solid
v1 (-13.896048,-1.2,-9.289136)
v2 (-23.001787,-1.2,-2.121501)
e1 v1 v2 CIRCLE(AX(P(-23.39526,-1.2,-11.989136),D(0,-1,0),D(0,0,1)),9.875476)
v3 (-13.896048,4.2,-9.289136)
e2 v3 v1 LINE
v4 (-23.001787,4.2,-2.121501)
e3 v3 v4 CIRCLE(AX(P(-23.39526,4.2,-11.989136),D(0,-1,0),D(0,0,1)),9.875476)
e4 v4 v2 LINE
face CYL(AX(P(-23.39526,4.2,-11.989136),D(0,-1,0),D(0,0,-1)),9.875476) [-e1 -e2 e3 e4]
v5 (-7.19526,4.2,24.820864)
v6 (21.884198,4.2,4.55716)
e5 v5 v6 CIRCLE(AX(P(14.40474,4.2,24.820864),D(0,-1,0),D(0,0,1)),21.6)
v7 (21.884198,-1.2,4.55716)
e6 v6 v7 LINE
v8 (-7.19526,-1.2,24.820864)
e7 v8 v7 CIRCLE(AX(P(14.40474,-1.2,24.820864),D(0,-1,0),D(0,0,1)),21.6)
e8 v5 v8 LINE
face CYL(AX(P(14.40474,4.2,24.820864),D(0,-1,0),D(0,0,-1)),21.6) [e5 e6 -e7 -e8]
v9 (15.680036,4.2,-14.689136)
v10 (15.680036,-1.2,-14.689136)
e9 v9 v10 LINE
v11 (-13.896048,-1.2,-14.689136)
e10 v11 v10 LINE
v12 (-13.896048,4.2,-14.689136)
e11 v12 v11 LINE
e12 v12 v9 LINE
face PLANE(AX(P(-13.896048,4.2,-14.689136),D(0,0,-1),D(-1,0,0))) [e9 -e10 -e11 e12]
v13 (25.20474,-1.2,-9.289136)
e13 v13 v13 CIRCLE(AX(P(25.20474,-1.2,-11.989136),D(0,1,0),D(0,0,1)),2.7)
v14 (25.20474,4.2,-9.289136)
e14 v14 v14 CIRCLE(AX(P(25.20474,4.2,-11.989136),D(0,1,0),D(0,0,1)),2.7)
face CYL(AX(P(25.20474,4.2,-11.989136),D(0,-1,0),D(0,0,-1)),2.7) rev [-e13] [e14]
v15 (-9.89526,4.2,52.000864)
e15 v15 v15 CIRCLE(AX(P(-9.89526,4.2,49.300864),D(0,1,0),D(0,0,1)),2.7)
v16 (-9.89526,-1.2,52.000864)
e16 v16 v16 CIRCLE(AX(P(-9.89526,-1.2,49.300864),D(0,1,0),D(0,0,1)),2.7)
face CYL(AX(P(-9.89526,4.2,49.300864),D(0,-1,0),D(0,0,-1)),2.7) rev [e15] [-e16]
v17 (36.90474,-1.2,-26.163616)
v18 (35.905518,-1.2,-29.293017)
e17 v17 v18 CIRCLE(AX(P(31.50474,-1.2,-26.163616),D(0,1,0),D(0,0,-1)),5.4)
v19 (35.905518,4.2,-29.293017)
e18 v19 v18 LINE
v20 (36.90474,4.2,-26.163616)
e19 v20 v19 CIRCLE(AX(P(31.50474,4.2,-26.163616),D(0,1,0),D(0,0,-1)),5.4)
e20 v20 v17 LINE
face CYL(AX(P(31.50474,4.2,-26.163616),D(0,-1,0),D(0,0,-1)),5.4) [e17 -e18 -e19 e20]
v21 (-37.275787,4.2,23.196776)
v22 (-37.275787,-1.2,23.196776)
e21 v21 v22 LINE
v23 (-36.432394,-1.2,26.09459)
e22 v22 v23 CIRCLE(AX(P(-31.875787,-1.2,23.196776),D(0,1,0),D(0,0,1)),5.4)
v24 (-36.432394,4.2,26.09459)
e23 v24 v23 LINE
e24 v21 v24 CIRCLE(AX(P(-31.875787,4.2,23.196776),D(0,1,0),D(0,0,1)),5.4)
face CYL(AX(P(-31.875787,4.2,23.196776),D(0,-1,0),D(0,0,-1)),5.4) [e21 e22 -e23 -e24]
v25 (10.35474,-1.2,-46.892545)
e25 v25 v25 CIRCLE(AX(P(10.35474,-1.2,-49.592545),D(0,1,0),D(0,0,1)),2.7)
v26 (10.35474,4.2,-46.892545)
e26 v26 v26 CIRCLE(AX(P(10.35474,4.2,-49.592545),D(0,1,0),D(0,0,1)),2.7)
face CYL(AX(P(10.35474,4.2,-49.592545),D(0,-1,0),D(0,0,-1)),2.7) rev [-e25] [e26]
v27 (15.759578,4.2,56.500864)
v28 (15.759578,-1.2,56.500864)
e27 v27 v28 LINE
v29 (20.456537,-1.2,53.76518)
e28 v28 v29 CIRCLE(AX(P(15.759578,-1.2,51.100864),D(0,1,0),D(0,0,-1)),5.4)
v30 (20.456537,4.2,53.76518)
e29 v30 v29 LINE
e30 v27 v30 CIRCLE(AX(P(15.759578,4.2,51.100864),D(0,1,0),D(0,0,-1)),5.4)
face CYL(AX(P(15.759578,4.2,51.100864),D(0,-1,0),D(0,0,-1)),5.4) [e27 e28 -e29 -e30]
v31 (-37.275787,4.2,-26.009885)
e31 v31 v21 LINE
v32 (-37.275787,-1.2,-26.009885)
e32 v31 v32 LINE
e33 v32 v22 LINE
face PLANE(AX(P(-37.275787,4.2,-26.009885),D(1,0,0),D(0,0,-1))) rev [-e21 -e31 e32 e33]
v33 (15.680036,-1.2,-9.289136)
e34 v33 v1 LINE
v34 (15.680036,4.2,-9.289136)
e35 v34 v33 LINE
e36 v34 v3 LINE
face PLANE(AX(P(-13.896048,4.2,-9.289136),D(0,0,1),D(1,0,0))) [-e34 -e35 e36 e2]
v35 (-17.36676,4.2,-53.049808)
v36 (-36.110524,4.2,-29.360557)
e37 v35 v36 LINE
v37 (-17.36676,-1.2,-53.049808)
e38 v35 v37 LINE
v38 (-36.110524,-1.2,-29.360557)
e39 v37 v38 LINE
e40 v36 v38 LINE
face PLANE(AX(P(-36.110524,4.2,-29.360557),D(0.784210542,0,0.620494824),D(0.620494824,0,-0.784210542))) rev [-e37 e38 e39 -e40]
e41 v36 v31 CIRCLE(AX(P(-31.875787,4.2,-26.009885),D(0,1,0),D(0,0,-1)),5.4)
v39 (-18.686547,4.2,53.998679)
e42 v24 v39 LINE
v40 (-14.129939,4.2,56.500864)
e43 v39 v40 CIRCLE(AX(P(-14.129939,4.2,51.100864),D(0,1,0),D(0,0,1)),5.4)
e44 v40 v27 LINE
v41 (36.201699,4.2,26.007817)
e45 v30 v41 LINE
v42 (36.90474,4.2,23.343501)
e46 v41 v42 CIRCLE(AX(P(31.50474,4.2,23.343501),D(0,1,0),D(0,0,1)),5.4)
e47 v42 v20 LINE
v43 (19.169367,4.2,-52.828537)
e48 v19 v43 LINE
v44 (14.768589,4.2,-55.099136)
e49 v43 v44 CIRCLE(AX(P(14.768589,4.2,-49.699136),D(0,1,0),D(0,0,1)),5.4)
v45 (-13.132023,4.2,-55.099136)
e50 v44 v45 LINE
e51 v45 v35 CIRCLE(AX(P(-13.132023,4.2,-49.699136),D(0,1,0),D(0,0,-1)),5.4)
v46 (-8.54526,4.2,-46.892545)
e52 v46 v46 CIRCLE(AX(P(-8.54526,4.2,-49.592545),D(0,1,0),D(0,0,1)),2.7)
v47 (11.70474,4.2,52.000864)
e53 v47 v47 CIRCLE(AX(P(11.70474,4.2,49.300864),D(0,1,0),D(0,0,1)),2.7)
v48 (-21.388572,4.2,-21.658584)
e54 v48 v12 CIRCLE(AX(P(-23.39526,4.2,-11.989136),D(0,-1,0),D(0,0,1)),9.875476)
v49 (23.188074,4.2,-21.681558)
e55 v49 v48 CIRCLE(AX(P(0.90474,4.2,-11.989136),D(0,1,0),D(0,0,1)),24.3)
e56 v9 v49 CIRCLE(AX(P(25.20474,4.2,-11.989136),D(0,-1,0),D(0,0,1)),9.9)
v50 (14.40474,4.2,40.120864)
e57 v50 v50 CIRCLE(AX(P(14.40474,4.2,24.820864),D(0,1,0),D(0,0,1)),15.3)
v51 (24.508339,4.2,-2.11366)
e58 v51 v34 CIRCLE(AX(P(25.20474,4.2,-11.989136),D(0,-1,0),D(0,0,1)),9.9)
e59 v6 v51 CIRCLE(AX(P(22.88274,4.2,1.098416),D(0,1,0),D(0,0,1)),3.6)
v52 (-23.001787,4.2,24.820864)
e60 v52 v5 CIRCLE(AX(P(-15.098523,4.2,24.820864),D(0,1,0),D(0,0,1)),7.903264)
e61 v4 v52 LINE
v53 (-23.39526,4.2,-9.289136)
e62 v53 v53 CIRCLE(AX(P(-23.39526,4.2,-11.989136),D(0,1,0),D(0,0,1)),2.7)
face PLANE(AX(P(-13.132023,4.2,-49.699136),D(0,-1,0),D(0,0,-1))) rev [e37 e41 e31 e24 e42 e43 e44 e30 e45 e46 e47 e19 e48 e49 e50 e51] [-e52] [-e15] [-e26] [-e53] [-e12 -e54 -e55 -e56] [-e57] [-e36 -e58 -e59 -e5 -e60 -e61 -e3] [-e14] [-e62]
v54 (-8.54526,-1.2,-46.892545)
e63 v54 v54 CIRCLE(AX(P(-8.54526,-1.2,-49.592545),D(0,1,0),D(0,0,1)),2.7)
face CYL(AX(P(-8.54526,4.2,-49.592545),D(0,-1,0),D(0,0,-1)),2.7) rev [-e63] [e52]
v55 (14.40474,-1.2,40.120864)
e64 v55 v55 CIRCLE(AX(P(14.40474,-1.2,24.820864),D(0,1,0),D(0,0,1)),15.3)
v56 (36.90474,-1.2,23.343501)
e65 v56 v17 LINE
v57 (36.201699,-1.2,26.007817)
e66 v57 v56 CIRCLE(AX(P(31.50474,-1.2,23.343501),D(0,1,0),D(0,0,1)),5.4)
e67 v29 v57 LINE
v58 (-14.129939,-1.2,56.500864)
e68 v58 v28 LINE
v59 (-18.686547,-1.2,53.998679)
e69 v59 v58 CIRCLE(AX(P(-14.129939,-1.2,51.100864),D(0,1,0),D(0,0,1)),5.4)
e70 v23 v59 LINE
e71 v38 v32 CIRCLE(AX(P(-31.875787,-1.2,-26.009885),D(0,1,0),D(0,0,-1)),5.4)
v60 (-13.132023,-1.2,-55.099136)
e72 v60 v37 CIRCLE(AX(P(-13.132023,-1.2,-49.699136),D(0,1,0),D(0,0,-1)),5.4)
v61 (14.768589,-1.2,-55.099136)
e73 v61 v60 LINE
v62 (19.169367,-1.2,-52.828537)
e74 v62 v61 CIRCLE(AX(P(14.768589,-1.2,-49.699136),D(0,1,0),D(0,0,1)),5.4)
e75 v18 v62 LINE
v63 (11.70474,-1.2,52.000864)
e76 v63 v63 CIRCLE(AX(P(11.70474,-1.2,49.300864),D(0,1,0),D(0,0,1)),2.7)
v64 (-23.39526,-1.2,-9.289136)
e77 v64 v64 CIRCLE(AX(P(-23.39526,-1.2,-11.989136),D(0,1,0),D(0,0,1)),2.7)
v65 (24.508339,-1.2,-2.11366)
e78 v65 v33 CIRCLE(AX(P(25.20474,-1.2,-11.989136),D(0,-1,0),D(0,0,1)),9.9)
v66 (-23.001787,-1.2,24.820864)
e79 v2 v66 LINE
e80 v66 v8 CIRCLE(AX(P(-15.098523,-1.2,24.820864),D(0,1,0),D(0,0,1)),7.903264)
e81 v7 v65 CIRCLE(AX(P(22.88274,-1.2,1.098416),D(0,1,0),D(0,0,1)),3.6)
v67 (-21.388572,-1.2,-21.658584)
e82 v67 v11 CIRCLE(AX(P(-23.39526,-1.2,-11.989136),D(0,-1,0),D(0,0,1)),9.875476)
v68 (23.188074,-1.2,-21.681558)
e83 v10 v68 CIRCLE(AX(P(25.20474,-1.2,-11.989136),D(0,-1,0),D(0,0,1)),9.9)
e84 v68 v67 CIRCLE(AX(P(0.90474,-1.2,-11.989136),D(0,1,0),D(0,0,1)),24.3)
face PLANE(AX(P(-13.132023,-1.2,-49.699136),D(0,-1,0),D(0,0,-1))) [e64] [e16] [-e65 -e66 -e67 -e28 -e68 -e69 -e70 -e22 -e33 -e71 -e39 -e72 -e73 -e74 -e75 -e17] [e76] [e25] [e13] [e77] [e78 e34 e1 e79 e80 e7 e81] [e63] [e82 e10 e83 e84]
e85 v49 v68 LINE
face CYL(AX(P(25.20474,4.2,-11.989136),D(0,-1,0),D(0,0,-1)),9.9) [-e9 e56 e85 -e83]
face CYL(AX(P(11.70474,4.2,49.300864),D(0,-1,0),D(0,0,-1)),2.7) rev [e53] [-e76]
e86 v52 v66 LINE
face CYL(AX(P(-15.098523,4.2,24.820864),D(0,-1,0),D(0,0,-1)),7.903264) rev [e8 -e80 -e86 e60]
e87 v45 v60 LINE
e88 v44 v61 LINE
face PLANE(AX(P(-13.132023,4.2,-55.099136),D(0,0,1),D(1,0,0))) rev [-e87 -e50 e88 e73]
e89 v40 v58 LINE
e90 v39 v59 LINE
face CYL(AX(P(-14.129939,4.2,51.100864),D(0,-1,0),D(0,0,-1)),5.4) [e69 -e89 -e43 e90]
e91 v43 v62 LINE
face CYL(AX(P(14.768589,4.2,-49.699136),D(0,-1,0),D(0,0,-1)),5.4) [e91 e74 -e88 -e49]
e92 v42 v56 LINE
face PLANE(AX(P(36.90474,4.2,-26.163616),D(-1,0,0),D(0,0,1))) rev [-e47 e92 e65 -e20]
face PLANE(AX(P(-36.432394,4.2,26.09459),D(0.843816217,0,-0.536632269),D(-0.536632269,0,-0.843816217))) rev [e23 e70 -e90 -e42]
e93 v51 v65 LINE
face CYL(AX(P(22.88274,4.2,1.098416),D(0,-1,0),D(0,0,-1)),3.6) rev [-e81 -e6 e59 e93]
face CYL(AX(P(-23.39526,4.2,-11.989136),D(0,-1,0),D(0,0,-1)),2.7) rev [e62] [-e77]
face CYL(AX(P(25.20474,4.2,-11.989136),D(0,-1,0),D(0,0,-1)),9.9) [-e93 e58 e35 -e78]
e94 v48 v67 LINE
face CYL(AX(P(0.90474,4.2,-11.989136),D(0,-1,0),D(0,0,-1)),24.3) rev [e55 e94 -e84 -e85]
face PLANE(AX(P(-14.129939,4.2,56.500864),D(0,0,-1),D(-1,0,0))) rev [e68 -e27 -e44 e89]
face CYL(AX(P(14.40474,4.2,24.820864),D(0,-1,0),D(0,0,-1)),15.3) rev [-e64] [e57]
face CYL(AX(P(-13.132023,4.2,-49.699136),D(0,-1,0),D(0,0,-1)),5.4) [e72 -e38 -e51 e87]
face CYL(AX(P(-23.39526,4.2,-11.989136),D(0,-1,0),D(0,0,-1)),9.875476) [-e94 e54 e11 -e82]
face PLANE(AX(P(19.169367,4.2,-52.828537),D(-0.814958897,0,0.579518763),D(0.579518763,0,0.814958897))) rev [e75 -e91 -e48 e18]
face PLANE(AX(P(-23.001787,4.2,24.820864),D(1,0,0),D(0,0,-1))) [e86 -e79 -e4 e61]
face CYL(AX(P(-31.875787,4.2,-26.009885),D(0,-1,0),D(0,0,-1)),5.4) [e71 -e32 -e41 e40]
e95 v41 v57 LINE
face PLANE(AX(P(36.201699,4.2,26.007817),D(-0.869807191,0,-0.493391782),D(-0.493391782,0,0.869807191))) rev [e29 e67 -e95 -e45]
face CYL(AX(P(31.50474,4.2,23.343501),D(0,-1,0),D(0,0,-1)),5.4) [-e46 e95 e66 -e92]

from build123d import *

# Parameters (mm, degrees)
SKETCH1_R          = 8.5
SKETCH1_R_2        = 1.5
BASE_FLANGE1_DEPTH = 3
SCALE1_SCALE       = 1.8


# Sheet-metal steps are written as plain solids
with BuildPart() as part:
    # Sketch1 → Base-Flange1 (new body)
    with BuildSketch(Plane(origin=(0, 0, 0), x_dir=(1, 0, 0), z_dir=(0, 1, 0))):
        with BuildLine():
            Line((19.609421573, -14.059417906), (10.862109445, -29.480175346))
            ThreePointArc((10.862109445, -29.480175346), (9.762567662, -30.59234701), (8.252687872, -31))
            Line((8.252687872, -31), (-8.352599575, -31))
            ThreePointArc((-8.352599575, -31), (-9.796606082, -30.629609326), (-10.884048227, -29.609896806))
            Line((-10.884048227, -29.609896806), (-20.742852548, -14.107625594))
            ThreePointArc((-20.742852548, -14.107625594), (-21.091885276, -13.336076582), (-21.211403896, -12.497728788))
            Line((-21.211403896, -12.497728788), (-21.211403896, 14.839305313))
            ThreePointArc((-21.211403896, 14.839305313), (-21.044943633, 15.824725306), (-20.564035521, 16.700789784))
            Line((-20.564035521, 16.700789784), (-10.150833328, 29.861484472))
            ThreePointArc((-10.150833328, 29.861484472), (-9.105019706, 30.700412322), (-7.798201703, 31))
            Line((-7.798201703, 31), (7.702138241, 31))
            ThreePointArc((7.702138241, 31), (9.077698333, 30.666052219), (10.147014932, 29.738556288))
            Line((10.147014932, 29.738556288), (19.444876691, 16.663267527))
            ThreePointArc((19.444876691, 16.663267527), (19.857851472, 15.837226972), (20, 14.924711239))
            Line((20, 14.924711239), (20, -12.57924256))
            ThreePointArc((20, -12.57924256), (19.900712388, -13.344662472), (19.609421573, -14.059417906))
        make_face()
        with Locations(Location((7.5, -13.4, 0), (0, 0, 270))):
            Circle(SKETCH1_R, mode=Mode.SUBTRACT)
        with Locations(Location((6, -27, 0), (0, 0, 270))):
            Circle(SKETCH1_R_2, mode=Mode.SUBTRACT)
        with Locations(Location((-6, -27, 0), (0, 0, 270))):
            Circle(SKETCH1_R_2, mode=Mode.SUBTRACT)
        with Locations(Location((5.25, 27.940782939, 0), (0, 0, 270))):
            Circle(SKETCH1_R_2, mode=Mode.SUBTRACT)
        with Locations(Location((-5.25, 27.940782939, 0), (0, 0, 270))):
            Circle(SKETCH1_R_2, mode=Mode.SUBTRACT)
        with Locations(Location((13.5, 7.05, 0), (0, 0, 270))):
            Circle(SKETCH1_R_2, mode=Mode.SUBTRACT)
        with Locations(Location((-13.5, 7.05, 0), (0, 0, 270))):
            Circle(SKETCH1_R_2, mode=Mode.SUBTRACT)
        with BuildLine():
            Line((-13.281403896, 0), (-13.281403896, 1.567980996))
            ThreePointArc((-13.281403896, 1.567980996), (-10.106558233, 2.738982767), (-8.222660082, 5.55))
            Line((-8.222660082, 5.55), (8.208497378, 5.55))
            ThreePointArc((8.208497378, 5.55), (10.031018679, 2.781959631), (13.113110627, 1.563624456))
            ThreePointArc((13.113110627, 1.563624456), (14.07117407, -0.953003234), (11.655254401, -2.142386538))
            ThreePointArc((11.655254401, -2.142386538), (0.639353267, -3.554619032), (-4.5, -13.4))
            ThreePointArc((-4.5, -13.4), (-8.890701948, -17.790701948), (-13.281403896, -13.4))
            Line((-13.281403896, -13.4), (-13.281403896, 0))
        make_face(mode=Mode.SUBTRACT)
        with BuildLine():
            Line((-8.222660082, 8.55), (8.208497378, 8.55))
            ThreePointArc((8.208497378, 8.55), (9.751572067, 11.074833914), (12.37962963, 12.434679214))
            ThreePointArc((12.37962963, 12.434679214), (-0.006957749, 20.549998207), (-12.385173459, 12.42191571))
            ThreePointArc((-12.385173459, 12.42191571), (-9.763306163, 11.067142739), (-8.222660082, 8.55))
        make_face(mode=Mode.SUBTRACT)
    extrude(amount=BASE_FLANGE1_DEPTH)


with BuildPart() as part_1:
    # Scale1: scaled about (-1.130925292, 1.5, -0.876080417)
    add(part.part.scale(SCALE1_SCALE).moved(Location((0.904740234, -1.2, 0.700864334))))


solid = part_1.part
